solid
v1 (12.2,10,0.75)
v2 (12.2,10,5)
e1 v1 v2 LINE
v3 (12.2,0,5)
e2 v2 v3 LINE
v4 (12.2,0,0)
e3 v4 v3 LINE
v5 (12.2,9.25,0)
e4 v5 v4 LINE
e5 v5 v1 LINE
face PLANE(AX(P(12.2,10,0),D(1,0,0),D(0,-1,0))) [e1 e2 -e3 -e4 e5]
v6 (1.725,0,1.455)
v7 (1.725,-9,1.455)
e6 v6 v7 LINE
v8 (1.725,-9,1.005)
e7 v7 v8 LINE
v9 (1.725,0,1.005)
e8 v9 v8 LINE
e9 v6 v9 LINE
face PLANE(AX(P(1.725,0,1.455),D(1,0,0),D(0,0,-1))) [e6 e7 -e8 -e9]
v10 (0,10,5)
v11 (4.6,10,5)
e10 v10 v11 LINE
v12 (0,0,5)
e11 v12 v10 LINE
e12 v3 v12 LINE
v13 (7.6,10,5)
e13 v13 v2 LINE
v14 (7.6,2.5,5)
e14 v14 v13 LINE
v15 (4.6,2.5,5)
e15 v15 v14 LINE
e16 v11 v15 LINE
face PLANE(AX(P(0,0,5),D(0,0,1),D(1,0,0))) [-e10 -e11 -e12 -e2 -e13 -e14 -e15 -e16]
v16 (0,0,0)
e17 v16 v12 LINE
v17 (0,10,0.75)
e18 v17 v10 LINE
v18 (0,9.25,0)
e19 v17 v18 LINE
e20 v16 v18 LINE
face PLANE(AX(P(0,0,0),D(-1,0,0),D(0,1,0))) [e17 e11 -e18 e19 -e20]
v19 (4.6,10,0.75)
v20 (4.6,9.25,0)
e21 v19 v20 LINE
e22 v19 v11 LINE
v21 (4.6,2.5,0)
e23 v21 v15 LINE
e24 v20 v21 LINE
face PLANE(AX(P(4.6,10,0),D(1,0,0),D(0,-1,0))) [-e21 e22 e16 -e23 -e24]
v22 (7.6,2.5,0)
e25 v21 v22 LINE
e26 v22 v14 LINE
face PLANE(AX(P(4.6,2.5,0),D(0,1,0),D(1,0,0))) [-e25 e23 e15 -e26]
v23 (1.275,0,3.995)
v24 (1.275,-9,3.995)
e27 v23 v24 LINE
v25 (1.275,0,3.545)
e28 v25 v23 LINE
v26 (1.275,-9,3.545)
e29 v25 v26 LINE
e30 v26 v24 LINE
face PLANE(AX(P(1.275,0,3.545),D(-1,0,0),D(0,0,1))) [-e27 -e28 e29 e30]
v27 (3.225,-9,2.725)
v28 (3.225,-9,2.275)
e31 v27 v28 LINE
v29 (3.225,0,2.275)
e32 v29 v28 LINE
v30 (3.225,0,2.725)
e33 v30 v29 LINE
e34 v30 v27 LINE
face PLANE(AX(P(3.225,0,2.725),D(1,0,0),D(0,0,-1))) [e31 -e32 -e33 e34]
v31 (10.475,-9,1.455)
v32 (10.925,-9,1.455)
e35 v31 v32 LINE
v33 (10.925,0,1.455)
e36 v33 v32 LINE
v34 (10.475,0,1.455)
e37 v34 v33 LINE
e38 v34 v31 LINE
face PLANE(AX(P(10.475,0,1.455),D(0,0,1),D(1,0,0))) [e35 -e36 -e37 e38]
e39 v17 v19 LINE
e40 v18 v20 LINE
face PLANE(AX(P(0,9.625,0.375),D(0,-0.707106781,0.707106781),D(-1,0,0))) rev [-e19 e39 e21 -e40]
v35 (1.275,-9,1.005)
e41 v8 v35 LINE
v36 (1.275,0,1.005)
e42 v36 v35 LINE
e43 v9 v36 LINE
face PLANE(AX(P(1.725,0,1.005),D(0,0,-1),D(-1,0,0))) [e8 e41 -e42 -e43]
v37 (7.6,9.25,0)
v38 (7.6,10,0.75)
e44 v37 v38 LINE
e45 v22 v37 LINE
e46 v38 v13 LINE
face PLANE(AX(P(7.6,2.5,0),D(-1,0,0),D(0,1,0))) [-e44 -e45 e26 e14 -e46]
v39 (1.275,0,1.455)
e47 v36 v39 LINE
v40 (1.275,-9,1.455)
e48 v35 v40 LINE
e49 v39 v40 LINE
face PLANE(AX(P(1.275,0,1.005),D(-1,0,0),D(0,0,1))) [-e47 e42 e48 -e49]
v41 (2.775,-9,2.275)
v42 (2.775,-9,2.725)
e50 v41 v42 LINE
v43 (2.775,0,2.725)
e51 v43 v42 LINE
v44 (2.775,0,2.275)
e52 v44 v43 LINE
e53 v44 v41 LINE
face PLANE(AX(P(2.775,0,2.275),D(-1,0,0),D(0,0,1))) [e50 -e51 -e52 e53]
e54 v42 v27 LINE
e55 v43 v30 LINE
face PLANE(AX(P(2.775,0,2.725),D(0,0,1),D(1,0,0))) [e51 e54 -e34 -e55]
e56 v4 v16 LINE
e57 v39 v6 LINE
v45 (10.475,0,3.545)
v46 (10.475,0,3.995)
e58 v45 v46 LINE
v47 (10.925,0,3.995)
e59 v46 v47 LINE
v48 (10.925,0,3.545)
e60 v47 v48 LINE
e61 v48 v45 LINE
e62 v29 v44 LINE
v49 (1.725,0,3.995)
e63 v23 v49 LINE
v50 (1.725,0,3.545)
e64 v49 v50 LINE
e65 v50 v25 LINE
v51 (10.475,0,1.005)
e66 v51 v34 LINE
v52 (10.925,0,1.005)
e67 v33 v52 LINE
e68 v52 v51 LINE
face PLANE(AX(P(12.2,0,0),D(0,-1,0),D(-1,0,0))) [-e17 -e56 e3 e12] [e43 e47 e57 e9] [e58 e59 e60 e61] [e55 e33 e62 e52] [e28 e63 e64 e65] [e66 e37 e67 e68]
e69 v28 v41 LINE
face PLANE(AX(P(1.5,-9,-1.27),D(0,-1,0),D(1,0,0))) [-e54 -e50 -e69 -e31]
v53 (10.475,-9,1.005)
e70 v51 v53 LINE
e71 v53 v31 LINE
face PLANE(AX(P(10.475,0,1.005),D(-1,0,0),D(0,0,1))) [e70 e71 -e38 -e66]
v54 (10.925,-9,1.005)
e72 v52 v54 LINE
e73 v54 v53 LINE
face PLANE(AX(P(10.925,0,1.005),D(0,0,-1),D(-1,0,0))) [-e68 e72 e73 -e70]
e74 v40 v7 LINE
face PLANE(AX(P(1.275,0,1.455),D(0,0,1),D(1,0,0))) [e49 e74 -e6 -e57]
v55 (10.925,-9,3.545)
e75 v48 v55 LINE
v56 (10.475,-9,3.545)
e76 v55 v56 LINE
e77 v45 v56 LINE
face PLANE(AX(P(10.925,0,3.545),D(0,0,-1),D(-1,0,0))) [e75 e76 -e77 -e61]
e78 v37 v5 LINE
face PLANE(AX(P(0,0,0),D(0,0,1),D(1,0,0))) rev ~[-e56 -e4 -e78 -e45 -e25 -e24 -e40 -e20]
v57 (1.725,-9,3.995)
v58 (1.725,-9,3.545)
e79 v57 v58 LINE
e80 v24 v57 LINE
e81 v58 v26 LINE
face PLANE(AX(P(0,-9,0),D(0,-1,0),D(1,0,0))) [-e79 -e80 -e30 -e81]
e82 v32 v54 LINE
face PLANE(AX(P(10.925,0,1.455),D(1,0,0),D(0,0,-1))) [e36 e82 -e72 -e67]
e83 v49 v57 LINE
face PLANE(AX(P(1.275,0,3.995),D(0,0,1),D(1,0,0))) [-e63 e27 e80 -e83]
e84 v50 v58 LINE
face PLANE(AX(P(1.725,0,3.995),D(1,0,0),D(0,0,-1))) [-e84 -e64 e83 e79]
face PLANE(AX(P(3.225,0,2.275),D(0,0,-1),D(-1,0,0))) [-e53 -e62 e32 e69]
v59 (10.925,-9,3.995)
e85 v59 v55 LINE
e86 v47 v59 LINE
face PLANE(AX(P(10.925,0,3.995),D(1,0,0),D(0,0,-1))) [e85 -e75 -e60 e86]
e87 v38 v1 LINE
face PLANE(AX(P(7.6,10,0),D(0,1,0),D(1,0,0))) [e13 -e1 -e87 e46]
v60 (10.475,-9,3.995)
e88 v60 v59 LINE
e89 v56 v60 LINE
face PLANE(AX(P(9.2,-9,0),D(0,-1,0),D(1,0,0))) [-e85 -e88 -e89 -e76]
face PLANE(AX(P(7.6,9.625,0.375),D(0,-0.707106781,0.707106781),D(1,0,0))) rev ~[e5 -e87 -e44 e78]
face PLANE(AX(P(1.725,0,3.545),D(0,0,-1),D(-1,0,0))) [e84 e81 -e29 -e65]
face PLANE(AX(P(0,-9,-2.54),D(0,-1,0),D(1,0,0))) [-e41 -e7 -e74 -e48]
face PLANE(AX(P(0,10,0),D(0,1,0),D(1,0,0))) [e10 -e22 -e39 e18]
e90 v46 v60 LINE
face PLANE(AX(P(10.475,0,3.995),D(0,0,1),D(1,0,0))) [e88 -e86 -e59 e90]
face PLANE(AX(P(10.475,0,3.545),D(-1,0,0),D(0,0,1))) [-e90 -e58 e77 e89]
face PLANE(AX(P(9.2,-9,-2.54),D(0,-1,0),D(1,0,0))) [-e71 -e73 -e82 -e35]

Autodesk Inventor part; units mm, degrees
ref_plane "YZ Plane" through (0, 0, 0) normal (1, 0, 0) x (0, 1, 0)
ref_plane "XZ Plane" through (0, 0, 0) normal (0, 1, 0) x (-1, 0, 0)
ref_plane "XY Plane" through (0, 0, 0) normal (0, 0, 1) x (1, 0, 0)
sketch "Sketch1" plane through (0, 0, 0) normal (0, 0, 1) x (1, 0, 0)
  line L0 (0, 0) -> (0, 10)
  line L1 (0, 10) -> (4.6, 10)
  line L2 (4.6, 10) -> (4.6, 2.5)
  line L3 (4.6, 2.5) -> (7.6, 2.5)
  line L4 (7.6, 2.5) -> (7.6, 10)
  line L5 (7.6, 10) -> (12.2, 10)
  line L6 (12.2, 10) -> (12.2, 0)
  line L7 (12.2, 0) -> (0, 0)
  dimension "d0" = 12.2
  dimension "d1" = 10
  dimension "d2" = 7.5
  dimension "d3" = 3
extrude "Extrusion1" add sketch "Sketch1" along normal blind 5
sketch "Sketch2" plane through (0, 0, 0) normal (0, -1, 0) x (1, 0, 0)
  line L0 (0, 0) -> (0, 5) projected
  line L1 (1.5, 3.77) -> (10.7, 3.77) construction
  line L2 (0, 5) -> (12.2, 5) construction
  line L3 (1.275, 3.995) -> (1.725, 3.995)
  line L4 (1.725, 3.995) -> (1.725, 3.545)
  line L5 (1.725, 3.545) -> (1.275, 3.545)
  line L6 (1.275, 3.545) -> (1.275, 3.995)
  line L7 (1.275, 3.995) -> (1.725, 3.545) construction
  line L8 (1.725, 3.995) -> (1.275, 3.545) construction
  point P0 (1.5, 1.23)
  point P1 (3, 2.5)
  point P2 (10.7, 1.23)
  point P3 (0, 2.5)
  point P4 (6.1, 3.77)
  point P5 (6.1, 5)
  dimension "d6" = 1.27
  dimension "d7" = 1.27
  dimension "d8" = 1.5
  dimension "d9" = 9.2
  dimension "d10" = 0.45
  dimension "d11" = 0.45
extrude "Extrusion2" add sketch "Sketch2" along normal blind 9
pattern_sketch "Sketch Driven Pattern1" of "Extrusion2" from (1.5, 0, 3.77) copies at (1.5, 0, 1.23) at (3, 0, 2.5) at (10.7, 0, 3.77) at (10.7, 0, 1.23)
chamfer "Chamfer1" distance 0.75 angle 45 2 edges at (9.9, 10, 0) (2.3, 10, 0)
properties part number "GP1A52HRJ00F (Large slot detector)"
